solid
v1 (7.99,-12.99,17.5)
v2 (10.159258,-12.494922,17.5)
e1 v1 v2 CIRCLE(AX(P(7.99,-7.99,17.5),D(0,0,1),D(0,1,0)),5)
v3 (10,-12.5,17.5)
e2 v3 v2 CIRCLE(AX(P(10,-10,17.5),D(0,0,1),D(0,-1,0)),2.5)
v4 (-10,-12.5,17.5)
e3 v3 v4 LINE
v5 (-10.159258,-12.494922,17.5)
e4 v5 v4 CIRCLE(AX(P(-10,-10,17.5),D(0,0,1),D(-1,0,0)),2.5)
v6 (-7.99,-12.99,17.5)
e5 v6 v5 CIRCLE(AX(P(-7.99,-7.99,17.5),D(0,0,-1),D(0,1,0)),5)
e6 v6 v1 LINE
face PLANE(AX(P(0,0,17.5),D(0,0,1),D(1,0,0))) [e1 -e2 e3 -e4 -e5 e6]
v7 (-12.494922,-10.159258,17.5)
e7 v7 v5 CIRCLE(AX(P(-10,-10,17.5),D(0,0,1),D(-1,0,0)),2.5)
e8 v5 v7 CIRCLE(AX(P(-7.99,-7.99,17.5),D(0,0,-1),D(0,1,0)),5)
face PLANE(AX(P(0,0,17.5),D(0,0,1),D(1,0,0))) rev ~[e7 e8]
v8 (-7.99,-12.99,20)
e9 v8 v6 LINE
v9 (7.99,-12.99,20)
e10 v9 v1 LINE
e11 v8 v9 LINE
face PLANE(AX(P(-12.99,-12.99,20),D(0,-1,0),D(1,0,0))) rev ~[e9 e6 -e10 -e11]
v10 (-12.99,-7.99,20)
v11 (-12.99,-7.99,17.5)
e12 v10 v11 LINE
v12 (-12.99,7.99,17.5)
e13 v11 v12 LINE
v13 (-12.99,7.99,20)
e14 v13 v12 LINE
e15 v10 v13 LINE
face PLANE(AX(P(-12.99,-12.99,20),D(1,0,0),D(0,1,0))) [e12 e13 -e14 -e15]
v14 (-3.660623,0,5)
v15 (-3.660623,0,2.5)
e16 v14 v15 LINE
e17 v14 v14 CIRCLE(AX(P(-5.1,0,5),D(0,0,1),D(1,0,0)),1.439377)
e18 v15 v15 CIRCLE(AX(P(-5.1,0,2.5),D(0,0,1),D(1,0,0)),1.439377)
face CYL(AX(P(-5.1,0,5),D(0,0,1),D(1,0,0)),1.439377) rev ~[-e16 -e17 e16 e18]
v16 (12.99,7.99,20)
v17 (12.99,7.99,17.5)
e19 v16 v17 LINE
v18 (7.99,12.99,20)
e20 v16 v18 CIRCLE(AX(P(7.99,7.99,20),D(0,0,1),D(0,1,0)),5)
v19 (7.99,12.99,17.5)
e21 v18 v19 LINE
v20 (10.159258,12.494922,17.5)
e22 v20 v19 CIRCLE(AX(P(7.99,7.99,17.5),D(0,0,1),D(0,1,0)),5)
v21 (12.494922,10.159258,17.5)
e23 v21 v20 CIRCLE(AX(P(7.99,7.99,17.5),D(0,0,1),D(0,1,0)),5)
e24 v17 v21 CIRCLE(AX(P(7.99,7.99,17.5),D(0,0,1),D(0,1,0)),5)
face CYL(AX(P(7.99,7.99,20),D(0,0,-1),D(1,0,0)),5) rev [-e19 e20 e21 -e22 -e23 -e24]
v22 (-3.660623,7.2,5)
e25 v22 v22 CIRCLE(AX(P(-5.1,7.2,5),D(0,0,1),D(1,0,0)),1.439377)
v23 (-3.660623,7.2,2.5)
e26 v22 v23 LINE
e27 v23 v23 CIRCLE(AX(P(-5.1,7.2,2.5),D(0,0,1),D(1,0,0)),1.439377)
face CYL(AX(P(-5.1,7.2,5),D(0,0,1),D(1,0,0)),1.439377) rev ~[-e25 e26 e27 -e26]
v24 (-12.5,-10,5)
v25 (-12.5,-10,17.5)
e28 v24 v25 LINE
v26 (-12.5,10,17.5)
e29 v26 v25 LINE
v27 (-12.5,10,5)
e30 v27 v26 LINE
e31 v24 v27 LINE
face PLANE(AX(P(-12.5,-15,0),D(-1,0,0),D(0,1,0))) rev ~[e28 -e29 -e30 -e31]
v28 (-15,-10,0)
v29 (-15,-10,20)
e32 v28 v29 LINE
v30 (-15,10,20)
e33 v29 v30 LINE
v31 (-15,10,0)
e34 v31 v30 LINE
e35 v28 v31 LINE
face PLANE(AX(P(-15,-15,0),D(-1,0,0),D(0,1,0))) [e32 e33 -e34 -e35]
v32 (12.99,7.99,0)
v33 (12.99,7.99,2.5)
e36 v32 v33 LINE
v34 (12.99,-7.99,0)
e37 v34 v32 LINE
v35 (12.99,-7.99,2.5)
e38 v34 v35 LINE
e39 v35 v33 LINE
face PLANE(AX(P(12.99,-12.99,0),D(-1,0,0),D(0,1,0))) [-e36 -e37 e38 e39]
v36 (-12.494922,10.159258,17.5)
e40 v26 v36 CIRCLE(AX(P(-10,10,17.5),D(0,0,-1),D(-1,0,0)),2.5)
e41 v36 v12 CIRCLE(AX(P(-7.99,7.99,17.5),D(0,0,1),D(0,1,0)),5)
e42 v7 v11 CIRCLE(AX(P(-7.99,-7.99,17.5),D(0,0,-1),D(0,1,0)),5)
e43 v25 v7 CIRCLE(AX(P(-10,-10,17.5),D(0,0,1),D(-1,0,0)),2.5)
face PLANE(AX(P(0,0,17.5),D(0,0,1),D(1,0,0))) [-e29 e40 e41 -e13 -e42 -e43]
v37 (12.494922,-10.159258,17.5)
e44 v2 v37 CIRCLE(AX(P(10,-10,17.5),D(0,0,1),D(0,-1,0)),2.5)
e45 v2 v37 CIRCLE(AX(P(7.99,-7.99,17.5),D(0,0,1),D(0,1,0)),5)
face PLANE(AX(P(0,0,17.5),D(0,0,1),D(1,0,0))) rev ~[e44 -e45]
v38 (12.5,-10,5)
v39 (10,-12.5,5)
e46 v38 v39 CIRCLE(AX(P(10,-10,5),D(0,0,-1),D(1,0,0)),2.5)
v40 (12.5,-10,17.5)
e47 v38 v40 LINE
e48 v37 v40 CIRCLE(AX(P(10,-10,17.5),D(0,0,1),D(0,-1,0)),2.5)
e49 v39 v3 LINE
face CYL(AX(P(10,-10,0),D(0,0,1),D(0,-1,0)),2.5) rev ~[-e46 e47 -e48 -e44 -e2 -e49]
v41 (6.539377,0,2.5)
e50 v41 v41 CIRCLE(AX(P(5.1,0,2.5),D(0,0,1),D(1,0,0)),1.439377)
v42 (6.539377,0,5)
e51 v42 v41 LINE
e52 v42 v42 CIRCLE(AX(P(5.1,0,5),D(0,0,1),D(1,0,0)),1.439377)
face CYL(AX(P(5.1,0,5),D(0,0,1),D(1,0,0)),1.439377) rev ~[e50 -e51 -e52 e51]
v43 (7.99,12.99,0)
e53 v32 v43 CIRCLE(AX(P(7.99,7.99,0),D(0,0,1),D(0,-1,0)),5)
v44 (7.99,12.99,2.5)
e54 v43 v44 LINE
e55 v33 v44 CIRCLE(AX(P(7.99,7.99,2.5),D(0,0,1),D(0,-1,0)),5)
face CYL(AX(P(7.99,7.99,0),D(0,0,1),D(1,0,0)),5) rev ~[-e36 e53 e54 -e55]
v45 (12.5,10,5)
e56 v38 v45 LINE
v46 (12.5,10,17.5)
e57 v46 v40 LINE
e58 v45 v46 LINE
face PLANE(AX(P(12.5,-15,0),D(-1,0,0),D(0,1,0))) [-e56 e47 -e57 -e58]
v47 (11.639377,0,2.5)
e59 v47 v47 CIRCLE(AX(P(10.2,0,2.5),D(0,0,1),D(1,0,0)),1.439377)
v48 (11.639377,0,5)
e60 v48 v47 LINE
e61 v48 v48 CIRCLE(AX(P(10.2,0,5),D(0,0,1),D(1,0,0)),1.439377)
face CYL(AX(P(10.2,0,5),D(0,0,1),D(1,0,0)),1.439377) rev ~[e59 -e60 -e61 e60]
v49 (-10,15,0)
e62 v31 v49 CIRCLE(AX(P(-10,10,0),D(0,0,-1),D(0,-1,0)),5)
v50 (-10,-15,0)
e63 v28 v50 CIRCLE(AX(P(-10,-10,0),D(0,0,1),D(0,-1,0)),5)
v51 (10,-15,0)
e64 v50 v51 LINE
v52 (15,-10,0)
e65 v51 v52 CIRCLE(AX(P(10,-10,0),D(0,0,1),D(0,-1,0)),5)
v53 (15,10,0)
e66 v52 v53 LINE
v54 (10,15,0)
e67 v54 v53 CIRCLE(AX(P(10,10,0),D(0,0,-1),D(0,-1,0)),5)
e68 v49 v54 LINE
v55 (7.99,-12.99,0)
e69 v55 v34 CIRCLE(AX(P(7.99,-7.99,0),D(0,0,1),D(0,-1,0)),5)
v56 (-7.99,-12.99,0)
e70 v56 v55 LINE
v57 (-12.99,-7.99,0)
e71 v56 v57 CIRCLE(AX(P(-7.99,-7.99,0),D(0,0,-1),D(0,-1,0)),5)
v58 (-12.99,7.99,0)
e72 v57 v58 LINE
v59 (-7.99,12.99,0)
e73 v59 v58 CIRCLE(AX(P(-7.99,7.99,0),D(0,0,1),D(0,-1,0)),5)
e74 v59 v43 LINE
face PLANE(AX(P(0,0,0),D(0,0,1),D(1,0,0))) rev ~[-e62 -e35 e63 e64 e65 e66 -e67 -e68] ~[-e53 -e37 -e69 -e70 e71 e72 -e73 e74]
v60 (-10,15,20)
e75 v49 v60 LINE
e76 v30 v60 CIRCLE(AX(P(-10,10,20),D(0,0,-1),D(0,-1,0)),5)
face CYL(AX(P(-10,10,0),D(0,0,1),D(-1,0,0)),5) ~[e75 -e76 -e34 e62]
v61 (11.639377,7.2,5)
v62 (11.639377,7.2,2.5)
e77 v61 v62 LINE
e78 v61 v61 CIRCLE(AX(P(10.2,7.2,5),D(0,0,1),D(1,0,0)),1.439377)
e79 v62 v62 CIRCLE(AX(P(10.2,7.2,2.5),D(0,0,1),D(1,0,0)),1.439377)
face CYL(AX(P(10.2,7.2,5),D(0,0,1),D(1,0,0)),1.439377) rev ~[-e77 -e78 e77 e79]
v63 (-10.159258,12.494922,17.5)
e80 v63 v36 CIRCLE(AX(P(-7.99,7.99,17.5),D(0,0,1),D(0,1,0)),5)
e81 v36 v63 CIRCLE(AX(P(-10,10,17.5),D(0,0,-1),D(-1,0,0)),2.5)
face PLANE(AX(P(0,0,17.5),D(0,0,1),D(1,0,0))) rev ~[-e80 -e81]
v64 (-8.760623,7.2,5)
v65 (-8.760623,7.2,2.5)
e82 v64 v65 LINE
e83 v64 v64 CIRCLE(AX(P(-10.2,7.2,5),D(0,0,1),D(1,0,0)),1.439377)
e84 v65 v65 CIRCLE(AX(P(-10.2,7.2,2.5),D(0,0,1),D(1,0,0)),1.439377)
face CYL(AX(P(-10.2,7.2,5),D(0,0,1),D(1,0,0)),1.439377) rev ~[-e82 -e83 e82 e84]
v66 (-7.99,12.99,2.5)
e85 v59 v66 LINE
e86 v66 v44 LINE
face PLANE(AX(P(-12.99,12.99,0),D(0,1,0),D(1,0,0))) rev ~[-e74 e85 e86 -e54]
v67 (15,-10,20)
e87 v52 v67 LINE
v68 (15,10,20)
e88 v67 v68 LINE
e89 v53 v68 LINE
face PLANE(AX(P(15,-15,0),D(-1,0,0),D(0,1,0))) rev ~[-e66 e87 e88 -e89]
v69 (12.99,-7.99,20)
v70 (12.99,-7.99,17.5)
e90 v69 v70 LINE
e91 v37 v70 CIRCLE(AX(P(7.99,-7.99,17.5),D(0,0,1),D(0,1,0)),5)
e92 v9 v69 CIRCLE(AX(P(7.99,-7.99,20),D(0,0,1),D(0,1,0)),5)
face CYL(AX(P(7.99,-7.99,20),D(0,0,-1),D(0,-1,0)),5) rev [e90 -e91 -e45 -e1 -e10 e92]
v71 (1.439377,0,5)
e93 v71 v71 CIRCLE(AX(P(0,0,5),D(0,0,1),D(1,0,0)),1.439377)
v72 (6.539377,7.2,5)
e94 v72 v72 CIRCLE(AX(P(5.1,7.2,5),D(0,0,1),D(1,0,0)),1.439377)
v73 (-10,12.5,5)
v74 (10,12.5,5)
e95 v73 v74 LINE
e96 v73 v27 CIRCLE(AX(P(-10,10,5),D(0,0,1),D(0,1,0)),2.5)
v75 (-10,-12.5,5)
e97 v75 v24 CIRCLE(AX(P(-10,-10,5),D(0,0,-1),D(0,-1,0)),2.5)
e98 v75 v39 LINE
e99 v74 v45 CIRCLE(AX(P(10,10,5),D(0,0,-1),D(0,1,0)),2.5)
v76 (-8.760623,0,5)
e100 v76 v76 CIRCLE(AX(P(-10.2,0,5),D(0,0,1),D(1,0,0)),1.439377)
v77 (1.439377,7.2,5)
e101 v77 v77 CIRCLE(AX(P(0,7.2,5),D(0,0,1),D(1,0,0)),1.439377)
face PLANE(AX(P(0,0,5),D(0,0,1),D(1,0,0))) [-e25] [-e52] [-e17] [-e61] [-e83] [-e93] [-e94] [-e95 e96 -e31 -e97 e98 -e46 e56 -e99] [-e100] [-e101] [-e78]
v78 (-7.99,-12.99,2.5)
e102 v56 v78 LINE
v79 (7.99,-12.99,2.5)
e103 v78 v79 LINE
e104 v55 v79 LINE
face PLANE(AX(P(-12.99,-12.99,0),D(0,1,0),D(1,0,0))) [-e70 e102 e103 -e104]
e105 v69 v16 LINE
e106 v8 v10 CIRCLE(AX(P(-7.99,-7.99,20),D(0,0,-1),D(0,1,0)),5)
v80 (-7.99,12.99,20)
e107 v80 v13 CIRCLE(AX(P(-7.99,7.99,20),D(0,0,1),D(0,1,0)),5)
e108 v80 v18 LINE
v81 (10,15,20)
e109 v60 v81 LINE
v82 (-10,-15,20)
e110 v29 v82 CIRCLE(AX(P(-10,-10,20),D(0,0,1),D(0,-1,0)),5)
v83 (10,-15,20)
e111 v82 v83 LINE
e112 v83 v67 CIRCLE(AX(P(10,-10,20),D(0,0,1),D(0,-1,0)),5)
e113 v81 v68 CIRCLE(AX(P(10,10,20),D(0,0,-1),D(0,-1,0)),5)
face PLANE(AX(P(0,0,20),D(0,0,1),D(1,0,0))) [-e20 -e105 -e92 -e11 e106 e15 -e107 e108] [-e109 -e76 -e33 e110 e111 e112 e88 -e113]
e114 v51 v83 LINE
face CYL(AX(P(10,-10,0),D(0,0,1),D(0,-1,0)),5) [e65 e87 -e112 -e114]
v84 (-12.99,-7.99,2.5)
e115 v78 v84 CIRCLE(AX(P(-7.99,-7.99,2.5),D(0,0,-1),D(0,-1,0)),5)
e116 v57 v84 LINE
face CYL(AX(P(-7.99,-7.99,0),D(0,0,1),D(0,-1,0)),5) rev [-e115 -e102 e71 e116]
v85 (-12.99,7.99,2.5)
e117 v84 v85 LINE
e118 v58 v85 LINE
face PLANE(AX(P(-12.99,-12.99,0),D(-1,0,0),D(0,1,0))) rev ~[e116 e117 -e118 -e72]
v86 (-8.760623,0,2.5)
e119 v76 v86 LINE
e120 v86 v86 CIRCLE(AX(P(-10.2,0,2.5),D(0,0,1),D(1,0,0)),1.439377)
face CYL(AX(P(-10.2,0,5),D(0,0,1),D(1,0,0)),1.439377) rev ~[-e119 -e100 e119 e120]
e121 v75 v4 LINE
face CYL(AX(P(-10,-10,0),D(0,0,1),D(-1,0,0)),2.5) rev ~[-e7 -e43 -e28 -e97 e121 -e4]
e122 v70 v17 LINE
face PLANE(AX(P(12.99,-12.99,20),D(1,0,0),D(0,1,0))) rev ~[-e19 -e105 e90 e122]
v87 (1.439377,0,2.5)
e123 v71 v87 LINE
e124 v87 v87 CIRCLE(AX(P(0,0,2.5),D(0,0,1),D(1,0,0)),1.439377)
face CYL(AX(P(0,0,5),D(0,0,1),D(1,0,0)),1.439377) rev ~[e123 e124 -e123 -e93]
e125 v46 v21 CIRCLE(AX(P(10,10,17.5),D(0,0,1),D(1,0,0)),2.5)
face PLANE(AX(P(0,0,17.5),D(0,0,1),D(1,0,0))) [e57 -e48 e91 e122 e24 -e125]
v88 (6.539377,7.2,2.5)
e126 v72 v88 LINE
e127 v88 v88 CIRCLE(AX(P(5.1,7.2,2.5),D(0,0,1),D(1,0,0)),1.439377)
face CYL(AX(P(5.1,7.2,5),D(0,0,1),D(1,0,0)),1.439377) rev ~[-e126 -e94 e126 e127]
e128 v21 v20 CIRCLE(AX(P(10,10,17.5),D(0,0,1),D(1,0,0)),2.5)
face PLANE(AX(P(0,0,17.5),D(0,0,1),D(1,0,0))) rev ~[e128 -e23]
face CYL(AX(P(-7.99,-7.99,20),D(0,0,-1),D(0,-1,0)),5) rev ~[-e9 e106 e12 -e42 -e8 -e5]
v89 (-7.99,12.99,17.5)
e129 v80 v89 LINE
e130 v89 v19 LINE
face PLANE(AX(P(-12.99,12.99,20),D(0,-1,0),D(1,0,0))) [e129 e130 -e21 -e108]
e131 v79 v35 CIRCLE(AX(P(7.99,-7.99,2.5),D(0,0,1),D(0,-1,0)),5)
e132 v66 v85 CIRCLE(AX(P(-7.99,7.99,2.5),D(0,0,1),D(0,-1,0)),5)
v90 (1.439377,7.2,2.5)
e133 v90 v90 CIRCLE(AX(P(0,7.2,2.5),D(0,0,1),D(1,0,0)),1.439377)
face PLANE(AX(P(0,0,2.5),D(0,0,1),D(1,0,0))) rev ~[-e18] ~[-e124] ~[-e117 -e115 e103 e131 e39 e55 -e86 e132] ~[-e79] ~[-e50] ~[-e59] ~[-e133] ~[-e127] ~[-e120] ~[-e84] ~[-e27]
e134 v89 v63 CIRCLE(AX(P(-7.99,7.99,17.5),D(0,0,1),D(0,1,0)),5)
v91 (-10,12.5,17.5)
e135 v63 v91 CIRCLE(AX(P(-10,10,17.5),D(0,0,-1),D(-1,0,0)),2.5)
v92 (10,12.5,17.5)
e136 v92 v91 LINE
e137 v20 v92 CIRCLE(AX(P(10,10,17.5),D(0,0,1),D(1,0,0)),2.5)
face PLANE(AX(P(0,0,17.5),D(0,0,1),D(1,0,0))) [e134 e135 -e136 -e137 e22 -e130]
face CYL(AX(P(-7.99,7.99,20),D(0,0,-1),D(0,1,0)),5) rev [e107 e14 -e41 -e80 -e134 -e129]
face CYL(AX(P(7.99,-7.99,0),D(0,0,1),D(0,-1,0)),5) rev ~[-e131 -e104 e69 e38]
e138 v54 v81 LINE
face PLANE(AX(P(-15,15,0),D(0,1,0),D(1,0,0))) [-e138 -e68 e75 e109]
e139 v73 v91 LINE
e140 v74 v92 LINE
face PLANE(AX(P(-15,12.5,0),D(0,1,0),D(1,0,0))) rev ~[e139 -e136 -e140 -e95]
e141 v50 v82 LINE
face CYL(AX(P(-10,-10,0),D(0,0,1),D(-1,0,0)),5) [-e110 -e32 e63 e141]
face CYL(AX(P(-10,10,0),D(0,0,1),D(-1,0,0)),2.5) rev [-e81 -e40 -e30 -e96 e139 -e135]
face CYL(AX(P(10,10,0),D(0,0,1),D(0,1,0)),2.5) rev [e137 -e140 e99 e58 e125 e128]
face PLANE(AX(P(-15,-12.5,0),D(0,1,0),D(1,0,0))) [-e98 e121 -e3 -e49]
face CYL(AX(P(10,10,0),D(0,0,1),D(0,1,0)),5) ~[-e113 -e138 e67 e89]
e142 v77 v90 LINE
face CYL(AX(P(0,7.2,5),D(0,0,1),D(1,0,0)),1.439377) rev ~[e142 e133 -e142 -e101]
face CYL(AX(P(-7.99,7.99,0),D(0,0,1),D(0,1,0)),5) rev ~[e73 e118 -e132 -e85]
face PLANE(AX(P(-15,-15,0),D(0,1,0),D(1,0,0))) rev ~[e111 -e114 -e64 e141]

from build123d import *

# Parameters (mm, degrees)
F0_W         = 30
F0_H         = 30
F1_DEPTH     = 20
F2_W         = 25.9800008498
F2_H         = 25.9800008498
F3_DEPTH     = 2.5
F4_W         = 25.9800008498
F4_H         = 25.9800008498
F5_DEPTH     = 2.5
F6_R         = 5
F7_T         = 2.5
F7_T3_DEPTH  = 20.9800008498
F7_T5_DEPTH  = 20.9800008498
F7_T8_ANGLE  = 90.000000001
F7_T10_ANGLE = 90.000000001
F7_T12_ANGLE = 90.000000001
F7_T14_ANGLE = 90.000000001
F8_R         = 1.4393768416
F9_DEPTH     = 25


# Not quite as in the source:
# - a shell that OpenCascade refuses in one call is made with other operations: the cavity is built on its own and cut out


with BuildPart() as f1:
    # F0 (on Top) → F1 (new body)
    with BuildSketch(Plane.XY):
        Rectangle(F0_W, F0_H)
    extrude(amount=F1_DEPTH)

    # F2 (on face) → F3 (cut)
    with BuildSketch(Plane.XY):
        Rectangle(F2_W, F2_H)
    extrude(amount=F3_DEPTH, mode=Mode.SUBTRACT)

    # F4 (on face) → F5 (cut)
    with BuildSketch(Plane.XY.offset(20)):
        Rectangle(F4_W, F4_H)
    extrude(amount=-F5_DEPTH, mode=Mode.SUBTRACT)

    # F6
    f6_edges = [f1.edges().sort_by_distance(p)[0] for p in [
        (-15, -15, 10),
        (-12.99, -12.99, 18.75),
        (-12.99, 12.99, 18.75),
        (12.99, -12.99, 18.75),
        (15, -15, 10),
        (15, 15, 10),
        (-15, 15, 10),
        (12.99, 12.99, 18.75),
        (-12.99, 12.99, 1.25),
        (12.99, -12.99, 1.25),
        (-12.99, -12.99, 1.25),
        (12.99, 12.99, 1.25),
    ]]
    fillet(f6_edges, radius=F6_R)

    # F7: shell of thickness 2.5, made by hand


with BuildPart() as f7_core1:
    # F7_t2: copy of F1
    add(f1.part)

    # the walls: a layer under each face that stays
    f7_faces = [f7_core1.faces().sort_by_distance(p)[0] for p in [
        (0, 15, 10),
        (-12.8571428571, -12.8571428571, 0),
        (13.5355339059, 13.5355339059, 10),
        (-13.5355339059, 13.5355339059, 10),
        (-12.8571428571, -12.8571428571, 20),
        (15, 0, 10),
        (-15, 0, 10),
        (13.5355339059, -13.5355339059, 10),
        (-13.5355339059, -13.5355339059, 10),
        (0, -15, 10),
        (-12.9900004249, 0, 1.25),
        (-11.5255343308, 11.5255343308, 1.25),
        (-11.5255343308, -11.5255343308, 1.25),
        (0, 12.9900004249, 1.25),
        (0, -12.9900004249, 1.25),
        (11.5255343308, 11.5255343308, 1.25),
        (11.5255343308, -11.5255343308, 1.25),
        (12.9900004249, 0, 1.25),
        (0, 12.9900004249, 18.75),
        (11.5255343308, 11.5255343308, 18.75),
        (-11.5255343308, 11.5255343308, 18.75),
        (12.9900004249, 0, 18.75),
        (-12.9900004249, 0, 18.75),
        (11.5255343308, -11.5255343308, 18.75),
        (-11.5255343308, -11.5255343308, 18.75),
        (0, -12.9900004249, 18.75),
        (0, 0, 2.5),
    ]]
    thicken(f7_faces, amount=-F7_T, mode=Mode.SUBTRACT)

    # F7_s4 → F7_t3 (cut)
    with BuildSketch(Plane.XZ.offset(-10.4900004249)):
        Polygon((-12.9650004249, 2.475), (-15.4900004249, 2.5), (-15.4900004249, 5), (-12.9900004249, 5), align=None)
        Polygon((12.9650004249, 2.475), (15.4900004249, 2.5), (15.4900004249, 5), (12.9900004249, 5), align=None)
    extrude(amount=F7_T3_DEPTH, mode=Mode.SUBTRACT)

    # F7_s6 → F7_t5 (cut)
    with BuildSketch(Plane.YZ.offset(-10.4900004249)):
        Polygon((12.9650004249, 2.475), (15.4900004249, 2.5), (15.4900004249, 5), (12.9900004249, 5), align=None)
        Polygon((-12.9650004249, 2.475), (-15.4900004249, 2.5), (-15.4900004249, 5), (-12.9900004249, 5), align=None)
    extrude(amount=F7_T5_DEPTH, mode=Mode.SUBTRACT)

    # F7_s7 → F7_t8 (revolve, cut)
    with BuildSketch(Plane.XZ.offset(-7.9900004249)):
        Polygon((-12.9650004249, 2.475), (-15.4900004249, 2.5), (-15.4900004249, 5), (-12.9900004249, 5), align=None)
    revolve(axis=Axis((-7.9900004249, 7.9900004249, 2.5), (0, 0, -1)), revolution_arc=F7_T8_ANGLE, mode=Mode.SUBTRACT)

    # F7_s9 → F7_t10 (revolve, cut)
    with BuildSketch(Plane.XZ.offset(7.9900004249)):
        Polygon((-12.9650004249, 2.475), (-15.4900004249, 2.5), (-15.4900004249, 5), (-12.9900004249, 5), align=None)
    revolve(axis=Axis((-7.9900004249, -7.9900004249, 2.5), (0, 0, 1)), revolution_arc=F7_T10_ANGLE, mode=Mode.SUBTRACT)

    # F7_s11 → F7_t12 (revolve, cut)
    with BuildSketch(Plane.XZ.offset(-7.9900004249)):
        Polygon((12.9650004249, 2.475), (15.4900004249, 2.5), (15.4900004249, 5), (12.9900004249, 5), align=None)
    revolve(axis=Axis((7.9900004249, 7.9900004249, 2.5), (0, 0, 1)), revolution_arc=F7_T12_ANGLE, mode=Mode.SUBTRACT)

    # F7_s13 → F7_t14 (revolve, cut)
    with BuildSketch(Plane.YZ.offset(7.9900004249)):
        Polygon((-12.9650004249, 2.475), (-15.4900004249, 2.5), (-15.4900004249, 5), (-12.9900004249, 5), align=None)
    revolve(axis=Axis((7.9900004249, -7.9900004249, 2.5), (0, 0, 1)), revolution_arc=F7_T14_ANGLE, mode=Mode.SUBTRACT)


with BuildPart() as f1_1:
    add(f1.part)

    # what is left inside the walls is the cavity
    f7_cavity = [f7_core1.part.solids().sort_by_distance(p)[0] for p in [
        (0, -4.166667, 17.475),
    ]]
    add(f7_cavity, mode=Mode.SUBTRACT)

    # F8 (on face) → F9 (cut)
    with BuildSketch(Plane.XY.offset(5)):
        Circle(F8_R)
        with Locations((0, 7.2)):
            Circle(F8_R)
        with Locations((5.1, 0)):
            Circle(F8_R)
        with Locations((5.1, 7.2)):
            Circle(F8_R)
        with Locations((10.2, 0)):
            Circle(F8_R)
        with Locations((10.2, 7.2)):
            Circle(F8_R)
        with Locations((-5.1, 0)):
            Circle(F8_R)
        with Locations((-10.2, 0)):
            Circle(F8_R)
        with Locations((-10.2, 7.2)):
            Circle(F8_R)
        with Locations((-5.1, 7.2)):
            Circle(F8_R)
    extrude(amount=-F9_DEPTH, mode=Mode.SUBTRACT)


solid = f1_1.part
